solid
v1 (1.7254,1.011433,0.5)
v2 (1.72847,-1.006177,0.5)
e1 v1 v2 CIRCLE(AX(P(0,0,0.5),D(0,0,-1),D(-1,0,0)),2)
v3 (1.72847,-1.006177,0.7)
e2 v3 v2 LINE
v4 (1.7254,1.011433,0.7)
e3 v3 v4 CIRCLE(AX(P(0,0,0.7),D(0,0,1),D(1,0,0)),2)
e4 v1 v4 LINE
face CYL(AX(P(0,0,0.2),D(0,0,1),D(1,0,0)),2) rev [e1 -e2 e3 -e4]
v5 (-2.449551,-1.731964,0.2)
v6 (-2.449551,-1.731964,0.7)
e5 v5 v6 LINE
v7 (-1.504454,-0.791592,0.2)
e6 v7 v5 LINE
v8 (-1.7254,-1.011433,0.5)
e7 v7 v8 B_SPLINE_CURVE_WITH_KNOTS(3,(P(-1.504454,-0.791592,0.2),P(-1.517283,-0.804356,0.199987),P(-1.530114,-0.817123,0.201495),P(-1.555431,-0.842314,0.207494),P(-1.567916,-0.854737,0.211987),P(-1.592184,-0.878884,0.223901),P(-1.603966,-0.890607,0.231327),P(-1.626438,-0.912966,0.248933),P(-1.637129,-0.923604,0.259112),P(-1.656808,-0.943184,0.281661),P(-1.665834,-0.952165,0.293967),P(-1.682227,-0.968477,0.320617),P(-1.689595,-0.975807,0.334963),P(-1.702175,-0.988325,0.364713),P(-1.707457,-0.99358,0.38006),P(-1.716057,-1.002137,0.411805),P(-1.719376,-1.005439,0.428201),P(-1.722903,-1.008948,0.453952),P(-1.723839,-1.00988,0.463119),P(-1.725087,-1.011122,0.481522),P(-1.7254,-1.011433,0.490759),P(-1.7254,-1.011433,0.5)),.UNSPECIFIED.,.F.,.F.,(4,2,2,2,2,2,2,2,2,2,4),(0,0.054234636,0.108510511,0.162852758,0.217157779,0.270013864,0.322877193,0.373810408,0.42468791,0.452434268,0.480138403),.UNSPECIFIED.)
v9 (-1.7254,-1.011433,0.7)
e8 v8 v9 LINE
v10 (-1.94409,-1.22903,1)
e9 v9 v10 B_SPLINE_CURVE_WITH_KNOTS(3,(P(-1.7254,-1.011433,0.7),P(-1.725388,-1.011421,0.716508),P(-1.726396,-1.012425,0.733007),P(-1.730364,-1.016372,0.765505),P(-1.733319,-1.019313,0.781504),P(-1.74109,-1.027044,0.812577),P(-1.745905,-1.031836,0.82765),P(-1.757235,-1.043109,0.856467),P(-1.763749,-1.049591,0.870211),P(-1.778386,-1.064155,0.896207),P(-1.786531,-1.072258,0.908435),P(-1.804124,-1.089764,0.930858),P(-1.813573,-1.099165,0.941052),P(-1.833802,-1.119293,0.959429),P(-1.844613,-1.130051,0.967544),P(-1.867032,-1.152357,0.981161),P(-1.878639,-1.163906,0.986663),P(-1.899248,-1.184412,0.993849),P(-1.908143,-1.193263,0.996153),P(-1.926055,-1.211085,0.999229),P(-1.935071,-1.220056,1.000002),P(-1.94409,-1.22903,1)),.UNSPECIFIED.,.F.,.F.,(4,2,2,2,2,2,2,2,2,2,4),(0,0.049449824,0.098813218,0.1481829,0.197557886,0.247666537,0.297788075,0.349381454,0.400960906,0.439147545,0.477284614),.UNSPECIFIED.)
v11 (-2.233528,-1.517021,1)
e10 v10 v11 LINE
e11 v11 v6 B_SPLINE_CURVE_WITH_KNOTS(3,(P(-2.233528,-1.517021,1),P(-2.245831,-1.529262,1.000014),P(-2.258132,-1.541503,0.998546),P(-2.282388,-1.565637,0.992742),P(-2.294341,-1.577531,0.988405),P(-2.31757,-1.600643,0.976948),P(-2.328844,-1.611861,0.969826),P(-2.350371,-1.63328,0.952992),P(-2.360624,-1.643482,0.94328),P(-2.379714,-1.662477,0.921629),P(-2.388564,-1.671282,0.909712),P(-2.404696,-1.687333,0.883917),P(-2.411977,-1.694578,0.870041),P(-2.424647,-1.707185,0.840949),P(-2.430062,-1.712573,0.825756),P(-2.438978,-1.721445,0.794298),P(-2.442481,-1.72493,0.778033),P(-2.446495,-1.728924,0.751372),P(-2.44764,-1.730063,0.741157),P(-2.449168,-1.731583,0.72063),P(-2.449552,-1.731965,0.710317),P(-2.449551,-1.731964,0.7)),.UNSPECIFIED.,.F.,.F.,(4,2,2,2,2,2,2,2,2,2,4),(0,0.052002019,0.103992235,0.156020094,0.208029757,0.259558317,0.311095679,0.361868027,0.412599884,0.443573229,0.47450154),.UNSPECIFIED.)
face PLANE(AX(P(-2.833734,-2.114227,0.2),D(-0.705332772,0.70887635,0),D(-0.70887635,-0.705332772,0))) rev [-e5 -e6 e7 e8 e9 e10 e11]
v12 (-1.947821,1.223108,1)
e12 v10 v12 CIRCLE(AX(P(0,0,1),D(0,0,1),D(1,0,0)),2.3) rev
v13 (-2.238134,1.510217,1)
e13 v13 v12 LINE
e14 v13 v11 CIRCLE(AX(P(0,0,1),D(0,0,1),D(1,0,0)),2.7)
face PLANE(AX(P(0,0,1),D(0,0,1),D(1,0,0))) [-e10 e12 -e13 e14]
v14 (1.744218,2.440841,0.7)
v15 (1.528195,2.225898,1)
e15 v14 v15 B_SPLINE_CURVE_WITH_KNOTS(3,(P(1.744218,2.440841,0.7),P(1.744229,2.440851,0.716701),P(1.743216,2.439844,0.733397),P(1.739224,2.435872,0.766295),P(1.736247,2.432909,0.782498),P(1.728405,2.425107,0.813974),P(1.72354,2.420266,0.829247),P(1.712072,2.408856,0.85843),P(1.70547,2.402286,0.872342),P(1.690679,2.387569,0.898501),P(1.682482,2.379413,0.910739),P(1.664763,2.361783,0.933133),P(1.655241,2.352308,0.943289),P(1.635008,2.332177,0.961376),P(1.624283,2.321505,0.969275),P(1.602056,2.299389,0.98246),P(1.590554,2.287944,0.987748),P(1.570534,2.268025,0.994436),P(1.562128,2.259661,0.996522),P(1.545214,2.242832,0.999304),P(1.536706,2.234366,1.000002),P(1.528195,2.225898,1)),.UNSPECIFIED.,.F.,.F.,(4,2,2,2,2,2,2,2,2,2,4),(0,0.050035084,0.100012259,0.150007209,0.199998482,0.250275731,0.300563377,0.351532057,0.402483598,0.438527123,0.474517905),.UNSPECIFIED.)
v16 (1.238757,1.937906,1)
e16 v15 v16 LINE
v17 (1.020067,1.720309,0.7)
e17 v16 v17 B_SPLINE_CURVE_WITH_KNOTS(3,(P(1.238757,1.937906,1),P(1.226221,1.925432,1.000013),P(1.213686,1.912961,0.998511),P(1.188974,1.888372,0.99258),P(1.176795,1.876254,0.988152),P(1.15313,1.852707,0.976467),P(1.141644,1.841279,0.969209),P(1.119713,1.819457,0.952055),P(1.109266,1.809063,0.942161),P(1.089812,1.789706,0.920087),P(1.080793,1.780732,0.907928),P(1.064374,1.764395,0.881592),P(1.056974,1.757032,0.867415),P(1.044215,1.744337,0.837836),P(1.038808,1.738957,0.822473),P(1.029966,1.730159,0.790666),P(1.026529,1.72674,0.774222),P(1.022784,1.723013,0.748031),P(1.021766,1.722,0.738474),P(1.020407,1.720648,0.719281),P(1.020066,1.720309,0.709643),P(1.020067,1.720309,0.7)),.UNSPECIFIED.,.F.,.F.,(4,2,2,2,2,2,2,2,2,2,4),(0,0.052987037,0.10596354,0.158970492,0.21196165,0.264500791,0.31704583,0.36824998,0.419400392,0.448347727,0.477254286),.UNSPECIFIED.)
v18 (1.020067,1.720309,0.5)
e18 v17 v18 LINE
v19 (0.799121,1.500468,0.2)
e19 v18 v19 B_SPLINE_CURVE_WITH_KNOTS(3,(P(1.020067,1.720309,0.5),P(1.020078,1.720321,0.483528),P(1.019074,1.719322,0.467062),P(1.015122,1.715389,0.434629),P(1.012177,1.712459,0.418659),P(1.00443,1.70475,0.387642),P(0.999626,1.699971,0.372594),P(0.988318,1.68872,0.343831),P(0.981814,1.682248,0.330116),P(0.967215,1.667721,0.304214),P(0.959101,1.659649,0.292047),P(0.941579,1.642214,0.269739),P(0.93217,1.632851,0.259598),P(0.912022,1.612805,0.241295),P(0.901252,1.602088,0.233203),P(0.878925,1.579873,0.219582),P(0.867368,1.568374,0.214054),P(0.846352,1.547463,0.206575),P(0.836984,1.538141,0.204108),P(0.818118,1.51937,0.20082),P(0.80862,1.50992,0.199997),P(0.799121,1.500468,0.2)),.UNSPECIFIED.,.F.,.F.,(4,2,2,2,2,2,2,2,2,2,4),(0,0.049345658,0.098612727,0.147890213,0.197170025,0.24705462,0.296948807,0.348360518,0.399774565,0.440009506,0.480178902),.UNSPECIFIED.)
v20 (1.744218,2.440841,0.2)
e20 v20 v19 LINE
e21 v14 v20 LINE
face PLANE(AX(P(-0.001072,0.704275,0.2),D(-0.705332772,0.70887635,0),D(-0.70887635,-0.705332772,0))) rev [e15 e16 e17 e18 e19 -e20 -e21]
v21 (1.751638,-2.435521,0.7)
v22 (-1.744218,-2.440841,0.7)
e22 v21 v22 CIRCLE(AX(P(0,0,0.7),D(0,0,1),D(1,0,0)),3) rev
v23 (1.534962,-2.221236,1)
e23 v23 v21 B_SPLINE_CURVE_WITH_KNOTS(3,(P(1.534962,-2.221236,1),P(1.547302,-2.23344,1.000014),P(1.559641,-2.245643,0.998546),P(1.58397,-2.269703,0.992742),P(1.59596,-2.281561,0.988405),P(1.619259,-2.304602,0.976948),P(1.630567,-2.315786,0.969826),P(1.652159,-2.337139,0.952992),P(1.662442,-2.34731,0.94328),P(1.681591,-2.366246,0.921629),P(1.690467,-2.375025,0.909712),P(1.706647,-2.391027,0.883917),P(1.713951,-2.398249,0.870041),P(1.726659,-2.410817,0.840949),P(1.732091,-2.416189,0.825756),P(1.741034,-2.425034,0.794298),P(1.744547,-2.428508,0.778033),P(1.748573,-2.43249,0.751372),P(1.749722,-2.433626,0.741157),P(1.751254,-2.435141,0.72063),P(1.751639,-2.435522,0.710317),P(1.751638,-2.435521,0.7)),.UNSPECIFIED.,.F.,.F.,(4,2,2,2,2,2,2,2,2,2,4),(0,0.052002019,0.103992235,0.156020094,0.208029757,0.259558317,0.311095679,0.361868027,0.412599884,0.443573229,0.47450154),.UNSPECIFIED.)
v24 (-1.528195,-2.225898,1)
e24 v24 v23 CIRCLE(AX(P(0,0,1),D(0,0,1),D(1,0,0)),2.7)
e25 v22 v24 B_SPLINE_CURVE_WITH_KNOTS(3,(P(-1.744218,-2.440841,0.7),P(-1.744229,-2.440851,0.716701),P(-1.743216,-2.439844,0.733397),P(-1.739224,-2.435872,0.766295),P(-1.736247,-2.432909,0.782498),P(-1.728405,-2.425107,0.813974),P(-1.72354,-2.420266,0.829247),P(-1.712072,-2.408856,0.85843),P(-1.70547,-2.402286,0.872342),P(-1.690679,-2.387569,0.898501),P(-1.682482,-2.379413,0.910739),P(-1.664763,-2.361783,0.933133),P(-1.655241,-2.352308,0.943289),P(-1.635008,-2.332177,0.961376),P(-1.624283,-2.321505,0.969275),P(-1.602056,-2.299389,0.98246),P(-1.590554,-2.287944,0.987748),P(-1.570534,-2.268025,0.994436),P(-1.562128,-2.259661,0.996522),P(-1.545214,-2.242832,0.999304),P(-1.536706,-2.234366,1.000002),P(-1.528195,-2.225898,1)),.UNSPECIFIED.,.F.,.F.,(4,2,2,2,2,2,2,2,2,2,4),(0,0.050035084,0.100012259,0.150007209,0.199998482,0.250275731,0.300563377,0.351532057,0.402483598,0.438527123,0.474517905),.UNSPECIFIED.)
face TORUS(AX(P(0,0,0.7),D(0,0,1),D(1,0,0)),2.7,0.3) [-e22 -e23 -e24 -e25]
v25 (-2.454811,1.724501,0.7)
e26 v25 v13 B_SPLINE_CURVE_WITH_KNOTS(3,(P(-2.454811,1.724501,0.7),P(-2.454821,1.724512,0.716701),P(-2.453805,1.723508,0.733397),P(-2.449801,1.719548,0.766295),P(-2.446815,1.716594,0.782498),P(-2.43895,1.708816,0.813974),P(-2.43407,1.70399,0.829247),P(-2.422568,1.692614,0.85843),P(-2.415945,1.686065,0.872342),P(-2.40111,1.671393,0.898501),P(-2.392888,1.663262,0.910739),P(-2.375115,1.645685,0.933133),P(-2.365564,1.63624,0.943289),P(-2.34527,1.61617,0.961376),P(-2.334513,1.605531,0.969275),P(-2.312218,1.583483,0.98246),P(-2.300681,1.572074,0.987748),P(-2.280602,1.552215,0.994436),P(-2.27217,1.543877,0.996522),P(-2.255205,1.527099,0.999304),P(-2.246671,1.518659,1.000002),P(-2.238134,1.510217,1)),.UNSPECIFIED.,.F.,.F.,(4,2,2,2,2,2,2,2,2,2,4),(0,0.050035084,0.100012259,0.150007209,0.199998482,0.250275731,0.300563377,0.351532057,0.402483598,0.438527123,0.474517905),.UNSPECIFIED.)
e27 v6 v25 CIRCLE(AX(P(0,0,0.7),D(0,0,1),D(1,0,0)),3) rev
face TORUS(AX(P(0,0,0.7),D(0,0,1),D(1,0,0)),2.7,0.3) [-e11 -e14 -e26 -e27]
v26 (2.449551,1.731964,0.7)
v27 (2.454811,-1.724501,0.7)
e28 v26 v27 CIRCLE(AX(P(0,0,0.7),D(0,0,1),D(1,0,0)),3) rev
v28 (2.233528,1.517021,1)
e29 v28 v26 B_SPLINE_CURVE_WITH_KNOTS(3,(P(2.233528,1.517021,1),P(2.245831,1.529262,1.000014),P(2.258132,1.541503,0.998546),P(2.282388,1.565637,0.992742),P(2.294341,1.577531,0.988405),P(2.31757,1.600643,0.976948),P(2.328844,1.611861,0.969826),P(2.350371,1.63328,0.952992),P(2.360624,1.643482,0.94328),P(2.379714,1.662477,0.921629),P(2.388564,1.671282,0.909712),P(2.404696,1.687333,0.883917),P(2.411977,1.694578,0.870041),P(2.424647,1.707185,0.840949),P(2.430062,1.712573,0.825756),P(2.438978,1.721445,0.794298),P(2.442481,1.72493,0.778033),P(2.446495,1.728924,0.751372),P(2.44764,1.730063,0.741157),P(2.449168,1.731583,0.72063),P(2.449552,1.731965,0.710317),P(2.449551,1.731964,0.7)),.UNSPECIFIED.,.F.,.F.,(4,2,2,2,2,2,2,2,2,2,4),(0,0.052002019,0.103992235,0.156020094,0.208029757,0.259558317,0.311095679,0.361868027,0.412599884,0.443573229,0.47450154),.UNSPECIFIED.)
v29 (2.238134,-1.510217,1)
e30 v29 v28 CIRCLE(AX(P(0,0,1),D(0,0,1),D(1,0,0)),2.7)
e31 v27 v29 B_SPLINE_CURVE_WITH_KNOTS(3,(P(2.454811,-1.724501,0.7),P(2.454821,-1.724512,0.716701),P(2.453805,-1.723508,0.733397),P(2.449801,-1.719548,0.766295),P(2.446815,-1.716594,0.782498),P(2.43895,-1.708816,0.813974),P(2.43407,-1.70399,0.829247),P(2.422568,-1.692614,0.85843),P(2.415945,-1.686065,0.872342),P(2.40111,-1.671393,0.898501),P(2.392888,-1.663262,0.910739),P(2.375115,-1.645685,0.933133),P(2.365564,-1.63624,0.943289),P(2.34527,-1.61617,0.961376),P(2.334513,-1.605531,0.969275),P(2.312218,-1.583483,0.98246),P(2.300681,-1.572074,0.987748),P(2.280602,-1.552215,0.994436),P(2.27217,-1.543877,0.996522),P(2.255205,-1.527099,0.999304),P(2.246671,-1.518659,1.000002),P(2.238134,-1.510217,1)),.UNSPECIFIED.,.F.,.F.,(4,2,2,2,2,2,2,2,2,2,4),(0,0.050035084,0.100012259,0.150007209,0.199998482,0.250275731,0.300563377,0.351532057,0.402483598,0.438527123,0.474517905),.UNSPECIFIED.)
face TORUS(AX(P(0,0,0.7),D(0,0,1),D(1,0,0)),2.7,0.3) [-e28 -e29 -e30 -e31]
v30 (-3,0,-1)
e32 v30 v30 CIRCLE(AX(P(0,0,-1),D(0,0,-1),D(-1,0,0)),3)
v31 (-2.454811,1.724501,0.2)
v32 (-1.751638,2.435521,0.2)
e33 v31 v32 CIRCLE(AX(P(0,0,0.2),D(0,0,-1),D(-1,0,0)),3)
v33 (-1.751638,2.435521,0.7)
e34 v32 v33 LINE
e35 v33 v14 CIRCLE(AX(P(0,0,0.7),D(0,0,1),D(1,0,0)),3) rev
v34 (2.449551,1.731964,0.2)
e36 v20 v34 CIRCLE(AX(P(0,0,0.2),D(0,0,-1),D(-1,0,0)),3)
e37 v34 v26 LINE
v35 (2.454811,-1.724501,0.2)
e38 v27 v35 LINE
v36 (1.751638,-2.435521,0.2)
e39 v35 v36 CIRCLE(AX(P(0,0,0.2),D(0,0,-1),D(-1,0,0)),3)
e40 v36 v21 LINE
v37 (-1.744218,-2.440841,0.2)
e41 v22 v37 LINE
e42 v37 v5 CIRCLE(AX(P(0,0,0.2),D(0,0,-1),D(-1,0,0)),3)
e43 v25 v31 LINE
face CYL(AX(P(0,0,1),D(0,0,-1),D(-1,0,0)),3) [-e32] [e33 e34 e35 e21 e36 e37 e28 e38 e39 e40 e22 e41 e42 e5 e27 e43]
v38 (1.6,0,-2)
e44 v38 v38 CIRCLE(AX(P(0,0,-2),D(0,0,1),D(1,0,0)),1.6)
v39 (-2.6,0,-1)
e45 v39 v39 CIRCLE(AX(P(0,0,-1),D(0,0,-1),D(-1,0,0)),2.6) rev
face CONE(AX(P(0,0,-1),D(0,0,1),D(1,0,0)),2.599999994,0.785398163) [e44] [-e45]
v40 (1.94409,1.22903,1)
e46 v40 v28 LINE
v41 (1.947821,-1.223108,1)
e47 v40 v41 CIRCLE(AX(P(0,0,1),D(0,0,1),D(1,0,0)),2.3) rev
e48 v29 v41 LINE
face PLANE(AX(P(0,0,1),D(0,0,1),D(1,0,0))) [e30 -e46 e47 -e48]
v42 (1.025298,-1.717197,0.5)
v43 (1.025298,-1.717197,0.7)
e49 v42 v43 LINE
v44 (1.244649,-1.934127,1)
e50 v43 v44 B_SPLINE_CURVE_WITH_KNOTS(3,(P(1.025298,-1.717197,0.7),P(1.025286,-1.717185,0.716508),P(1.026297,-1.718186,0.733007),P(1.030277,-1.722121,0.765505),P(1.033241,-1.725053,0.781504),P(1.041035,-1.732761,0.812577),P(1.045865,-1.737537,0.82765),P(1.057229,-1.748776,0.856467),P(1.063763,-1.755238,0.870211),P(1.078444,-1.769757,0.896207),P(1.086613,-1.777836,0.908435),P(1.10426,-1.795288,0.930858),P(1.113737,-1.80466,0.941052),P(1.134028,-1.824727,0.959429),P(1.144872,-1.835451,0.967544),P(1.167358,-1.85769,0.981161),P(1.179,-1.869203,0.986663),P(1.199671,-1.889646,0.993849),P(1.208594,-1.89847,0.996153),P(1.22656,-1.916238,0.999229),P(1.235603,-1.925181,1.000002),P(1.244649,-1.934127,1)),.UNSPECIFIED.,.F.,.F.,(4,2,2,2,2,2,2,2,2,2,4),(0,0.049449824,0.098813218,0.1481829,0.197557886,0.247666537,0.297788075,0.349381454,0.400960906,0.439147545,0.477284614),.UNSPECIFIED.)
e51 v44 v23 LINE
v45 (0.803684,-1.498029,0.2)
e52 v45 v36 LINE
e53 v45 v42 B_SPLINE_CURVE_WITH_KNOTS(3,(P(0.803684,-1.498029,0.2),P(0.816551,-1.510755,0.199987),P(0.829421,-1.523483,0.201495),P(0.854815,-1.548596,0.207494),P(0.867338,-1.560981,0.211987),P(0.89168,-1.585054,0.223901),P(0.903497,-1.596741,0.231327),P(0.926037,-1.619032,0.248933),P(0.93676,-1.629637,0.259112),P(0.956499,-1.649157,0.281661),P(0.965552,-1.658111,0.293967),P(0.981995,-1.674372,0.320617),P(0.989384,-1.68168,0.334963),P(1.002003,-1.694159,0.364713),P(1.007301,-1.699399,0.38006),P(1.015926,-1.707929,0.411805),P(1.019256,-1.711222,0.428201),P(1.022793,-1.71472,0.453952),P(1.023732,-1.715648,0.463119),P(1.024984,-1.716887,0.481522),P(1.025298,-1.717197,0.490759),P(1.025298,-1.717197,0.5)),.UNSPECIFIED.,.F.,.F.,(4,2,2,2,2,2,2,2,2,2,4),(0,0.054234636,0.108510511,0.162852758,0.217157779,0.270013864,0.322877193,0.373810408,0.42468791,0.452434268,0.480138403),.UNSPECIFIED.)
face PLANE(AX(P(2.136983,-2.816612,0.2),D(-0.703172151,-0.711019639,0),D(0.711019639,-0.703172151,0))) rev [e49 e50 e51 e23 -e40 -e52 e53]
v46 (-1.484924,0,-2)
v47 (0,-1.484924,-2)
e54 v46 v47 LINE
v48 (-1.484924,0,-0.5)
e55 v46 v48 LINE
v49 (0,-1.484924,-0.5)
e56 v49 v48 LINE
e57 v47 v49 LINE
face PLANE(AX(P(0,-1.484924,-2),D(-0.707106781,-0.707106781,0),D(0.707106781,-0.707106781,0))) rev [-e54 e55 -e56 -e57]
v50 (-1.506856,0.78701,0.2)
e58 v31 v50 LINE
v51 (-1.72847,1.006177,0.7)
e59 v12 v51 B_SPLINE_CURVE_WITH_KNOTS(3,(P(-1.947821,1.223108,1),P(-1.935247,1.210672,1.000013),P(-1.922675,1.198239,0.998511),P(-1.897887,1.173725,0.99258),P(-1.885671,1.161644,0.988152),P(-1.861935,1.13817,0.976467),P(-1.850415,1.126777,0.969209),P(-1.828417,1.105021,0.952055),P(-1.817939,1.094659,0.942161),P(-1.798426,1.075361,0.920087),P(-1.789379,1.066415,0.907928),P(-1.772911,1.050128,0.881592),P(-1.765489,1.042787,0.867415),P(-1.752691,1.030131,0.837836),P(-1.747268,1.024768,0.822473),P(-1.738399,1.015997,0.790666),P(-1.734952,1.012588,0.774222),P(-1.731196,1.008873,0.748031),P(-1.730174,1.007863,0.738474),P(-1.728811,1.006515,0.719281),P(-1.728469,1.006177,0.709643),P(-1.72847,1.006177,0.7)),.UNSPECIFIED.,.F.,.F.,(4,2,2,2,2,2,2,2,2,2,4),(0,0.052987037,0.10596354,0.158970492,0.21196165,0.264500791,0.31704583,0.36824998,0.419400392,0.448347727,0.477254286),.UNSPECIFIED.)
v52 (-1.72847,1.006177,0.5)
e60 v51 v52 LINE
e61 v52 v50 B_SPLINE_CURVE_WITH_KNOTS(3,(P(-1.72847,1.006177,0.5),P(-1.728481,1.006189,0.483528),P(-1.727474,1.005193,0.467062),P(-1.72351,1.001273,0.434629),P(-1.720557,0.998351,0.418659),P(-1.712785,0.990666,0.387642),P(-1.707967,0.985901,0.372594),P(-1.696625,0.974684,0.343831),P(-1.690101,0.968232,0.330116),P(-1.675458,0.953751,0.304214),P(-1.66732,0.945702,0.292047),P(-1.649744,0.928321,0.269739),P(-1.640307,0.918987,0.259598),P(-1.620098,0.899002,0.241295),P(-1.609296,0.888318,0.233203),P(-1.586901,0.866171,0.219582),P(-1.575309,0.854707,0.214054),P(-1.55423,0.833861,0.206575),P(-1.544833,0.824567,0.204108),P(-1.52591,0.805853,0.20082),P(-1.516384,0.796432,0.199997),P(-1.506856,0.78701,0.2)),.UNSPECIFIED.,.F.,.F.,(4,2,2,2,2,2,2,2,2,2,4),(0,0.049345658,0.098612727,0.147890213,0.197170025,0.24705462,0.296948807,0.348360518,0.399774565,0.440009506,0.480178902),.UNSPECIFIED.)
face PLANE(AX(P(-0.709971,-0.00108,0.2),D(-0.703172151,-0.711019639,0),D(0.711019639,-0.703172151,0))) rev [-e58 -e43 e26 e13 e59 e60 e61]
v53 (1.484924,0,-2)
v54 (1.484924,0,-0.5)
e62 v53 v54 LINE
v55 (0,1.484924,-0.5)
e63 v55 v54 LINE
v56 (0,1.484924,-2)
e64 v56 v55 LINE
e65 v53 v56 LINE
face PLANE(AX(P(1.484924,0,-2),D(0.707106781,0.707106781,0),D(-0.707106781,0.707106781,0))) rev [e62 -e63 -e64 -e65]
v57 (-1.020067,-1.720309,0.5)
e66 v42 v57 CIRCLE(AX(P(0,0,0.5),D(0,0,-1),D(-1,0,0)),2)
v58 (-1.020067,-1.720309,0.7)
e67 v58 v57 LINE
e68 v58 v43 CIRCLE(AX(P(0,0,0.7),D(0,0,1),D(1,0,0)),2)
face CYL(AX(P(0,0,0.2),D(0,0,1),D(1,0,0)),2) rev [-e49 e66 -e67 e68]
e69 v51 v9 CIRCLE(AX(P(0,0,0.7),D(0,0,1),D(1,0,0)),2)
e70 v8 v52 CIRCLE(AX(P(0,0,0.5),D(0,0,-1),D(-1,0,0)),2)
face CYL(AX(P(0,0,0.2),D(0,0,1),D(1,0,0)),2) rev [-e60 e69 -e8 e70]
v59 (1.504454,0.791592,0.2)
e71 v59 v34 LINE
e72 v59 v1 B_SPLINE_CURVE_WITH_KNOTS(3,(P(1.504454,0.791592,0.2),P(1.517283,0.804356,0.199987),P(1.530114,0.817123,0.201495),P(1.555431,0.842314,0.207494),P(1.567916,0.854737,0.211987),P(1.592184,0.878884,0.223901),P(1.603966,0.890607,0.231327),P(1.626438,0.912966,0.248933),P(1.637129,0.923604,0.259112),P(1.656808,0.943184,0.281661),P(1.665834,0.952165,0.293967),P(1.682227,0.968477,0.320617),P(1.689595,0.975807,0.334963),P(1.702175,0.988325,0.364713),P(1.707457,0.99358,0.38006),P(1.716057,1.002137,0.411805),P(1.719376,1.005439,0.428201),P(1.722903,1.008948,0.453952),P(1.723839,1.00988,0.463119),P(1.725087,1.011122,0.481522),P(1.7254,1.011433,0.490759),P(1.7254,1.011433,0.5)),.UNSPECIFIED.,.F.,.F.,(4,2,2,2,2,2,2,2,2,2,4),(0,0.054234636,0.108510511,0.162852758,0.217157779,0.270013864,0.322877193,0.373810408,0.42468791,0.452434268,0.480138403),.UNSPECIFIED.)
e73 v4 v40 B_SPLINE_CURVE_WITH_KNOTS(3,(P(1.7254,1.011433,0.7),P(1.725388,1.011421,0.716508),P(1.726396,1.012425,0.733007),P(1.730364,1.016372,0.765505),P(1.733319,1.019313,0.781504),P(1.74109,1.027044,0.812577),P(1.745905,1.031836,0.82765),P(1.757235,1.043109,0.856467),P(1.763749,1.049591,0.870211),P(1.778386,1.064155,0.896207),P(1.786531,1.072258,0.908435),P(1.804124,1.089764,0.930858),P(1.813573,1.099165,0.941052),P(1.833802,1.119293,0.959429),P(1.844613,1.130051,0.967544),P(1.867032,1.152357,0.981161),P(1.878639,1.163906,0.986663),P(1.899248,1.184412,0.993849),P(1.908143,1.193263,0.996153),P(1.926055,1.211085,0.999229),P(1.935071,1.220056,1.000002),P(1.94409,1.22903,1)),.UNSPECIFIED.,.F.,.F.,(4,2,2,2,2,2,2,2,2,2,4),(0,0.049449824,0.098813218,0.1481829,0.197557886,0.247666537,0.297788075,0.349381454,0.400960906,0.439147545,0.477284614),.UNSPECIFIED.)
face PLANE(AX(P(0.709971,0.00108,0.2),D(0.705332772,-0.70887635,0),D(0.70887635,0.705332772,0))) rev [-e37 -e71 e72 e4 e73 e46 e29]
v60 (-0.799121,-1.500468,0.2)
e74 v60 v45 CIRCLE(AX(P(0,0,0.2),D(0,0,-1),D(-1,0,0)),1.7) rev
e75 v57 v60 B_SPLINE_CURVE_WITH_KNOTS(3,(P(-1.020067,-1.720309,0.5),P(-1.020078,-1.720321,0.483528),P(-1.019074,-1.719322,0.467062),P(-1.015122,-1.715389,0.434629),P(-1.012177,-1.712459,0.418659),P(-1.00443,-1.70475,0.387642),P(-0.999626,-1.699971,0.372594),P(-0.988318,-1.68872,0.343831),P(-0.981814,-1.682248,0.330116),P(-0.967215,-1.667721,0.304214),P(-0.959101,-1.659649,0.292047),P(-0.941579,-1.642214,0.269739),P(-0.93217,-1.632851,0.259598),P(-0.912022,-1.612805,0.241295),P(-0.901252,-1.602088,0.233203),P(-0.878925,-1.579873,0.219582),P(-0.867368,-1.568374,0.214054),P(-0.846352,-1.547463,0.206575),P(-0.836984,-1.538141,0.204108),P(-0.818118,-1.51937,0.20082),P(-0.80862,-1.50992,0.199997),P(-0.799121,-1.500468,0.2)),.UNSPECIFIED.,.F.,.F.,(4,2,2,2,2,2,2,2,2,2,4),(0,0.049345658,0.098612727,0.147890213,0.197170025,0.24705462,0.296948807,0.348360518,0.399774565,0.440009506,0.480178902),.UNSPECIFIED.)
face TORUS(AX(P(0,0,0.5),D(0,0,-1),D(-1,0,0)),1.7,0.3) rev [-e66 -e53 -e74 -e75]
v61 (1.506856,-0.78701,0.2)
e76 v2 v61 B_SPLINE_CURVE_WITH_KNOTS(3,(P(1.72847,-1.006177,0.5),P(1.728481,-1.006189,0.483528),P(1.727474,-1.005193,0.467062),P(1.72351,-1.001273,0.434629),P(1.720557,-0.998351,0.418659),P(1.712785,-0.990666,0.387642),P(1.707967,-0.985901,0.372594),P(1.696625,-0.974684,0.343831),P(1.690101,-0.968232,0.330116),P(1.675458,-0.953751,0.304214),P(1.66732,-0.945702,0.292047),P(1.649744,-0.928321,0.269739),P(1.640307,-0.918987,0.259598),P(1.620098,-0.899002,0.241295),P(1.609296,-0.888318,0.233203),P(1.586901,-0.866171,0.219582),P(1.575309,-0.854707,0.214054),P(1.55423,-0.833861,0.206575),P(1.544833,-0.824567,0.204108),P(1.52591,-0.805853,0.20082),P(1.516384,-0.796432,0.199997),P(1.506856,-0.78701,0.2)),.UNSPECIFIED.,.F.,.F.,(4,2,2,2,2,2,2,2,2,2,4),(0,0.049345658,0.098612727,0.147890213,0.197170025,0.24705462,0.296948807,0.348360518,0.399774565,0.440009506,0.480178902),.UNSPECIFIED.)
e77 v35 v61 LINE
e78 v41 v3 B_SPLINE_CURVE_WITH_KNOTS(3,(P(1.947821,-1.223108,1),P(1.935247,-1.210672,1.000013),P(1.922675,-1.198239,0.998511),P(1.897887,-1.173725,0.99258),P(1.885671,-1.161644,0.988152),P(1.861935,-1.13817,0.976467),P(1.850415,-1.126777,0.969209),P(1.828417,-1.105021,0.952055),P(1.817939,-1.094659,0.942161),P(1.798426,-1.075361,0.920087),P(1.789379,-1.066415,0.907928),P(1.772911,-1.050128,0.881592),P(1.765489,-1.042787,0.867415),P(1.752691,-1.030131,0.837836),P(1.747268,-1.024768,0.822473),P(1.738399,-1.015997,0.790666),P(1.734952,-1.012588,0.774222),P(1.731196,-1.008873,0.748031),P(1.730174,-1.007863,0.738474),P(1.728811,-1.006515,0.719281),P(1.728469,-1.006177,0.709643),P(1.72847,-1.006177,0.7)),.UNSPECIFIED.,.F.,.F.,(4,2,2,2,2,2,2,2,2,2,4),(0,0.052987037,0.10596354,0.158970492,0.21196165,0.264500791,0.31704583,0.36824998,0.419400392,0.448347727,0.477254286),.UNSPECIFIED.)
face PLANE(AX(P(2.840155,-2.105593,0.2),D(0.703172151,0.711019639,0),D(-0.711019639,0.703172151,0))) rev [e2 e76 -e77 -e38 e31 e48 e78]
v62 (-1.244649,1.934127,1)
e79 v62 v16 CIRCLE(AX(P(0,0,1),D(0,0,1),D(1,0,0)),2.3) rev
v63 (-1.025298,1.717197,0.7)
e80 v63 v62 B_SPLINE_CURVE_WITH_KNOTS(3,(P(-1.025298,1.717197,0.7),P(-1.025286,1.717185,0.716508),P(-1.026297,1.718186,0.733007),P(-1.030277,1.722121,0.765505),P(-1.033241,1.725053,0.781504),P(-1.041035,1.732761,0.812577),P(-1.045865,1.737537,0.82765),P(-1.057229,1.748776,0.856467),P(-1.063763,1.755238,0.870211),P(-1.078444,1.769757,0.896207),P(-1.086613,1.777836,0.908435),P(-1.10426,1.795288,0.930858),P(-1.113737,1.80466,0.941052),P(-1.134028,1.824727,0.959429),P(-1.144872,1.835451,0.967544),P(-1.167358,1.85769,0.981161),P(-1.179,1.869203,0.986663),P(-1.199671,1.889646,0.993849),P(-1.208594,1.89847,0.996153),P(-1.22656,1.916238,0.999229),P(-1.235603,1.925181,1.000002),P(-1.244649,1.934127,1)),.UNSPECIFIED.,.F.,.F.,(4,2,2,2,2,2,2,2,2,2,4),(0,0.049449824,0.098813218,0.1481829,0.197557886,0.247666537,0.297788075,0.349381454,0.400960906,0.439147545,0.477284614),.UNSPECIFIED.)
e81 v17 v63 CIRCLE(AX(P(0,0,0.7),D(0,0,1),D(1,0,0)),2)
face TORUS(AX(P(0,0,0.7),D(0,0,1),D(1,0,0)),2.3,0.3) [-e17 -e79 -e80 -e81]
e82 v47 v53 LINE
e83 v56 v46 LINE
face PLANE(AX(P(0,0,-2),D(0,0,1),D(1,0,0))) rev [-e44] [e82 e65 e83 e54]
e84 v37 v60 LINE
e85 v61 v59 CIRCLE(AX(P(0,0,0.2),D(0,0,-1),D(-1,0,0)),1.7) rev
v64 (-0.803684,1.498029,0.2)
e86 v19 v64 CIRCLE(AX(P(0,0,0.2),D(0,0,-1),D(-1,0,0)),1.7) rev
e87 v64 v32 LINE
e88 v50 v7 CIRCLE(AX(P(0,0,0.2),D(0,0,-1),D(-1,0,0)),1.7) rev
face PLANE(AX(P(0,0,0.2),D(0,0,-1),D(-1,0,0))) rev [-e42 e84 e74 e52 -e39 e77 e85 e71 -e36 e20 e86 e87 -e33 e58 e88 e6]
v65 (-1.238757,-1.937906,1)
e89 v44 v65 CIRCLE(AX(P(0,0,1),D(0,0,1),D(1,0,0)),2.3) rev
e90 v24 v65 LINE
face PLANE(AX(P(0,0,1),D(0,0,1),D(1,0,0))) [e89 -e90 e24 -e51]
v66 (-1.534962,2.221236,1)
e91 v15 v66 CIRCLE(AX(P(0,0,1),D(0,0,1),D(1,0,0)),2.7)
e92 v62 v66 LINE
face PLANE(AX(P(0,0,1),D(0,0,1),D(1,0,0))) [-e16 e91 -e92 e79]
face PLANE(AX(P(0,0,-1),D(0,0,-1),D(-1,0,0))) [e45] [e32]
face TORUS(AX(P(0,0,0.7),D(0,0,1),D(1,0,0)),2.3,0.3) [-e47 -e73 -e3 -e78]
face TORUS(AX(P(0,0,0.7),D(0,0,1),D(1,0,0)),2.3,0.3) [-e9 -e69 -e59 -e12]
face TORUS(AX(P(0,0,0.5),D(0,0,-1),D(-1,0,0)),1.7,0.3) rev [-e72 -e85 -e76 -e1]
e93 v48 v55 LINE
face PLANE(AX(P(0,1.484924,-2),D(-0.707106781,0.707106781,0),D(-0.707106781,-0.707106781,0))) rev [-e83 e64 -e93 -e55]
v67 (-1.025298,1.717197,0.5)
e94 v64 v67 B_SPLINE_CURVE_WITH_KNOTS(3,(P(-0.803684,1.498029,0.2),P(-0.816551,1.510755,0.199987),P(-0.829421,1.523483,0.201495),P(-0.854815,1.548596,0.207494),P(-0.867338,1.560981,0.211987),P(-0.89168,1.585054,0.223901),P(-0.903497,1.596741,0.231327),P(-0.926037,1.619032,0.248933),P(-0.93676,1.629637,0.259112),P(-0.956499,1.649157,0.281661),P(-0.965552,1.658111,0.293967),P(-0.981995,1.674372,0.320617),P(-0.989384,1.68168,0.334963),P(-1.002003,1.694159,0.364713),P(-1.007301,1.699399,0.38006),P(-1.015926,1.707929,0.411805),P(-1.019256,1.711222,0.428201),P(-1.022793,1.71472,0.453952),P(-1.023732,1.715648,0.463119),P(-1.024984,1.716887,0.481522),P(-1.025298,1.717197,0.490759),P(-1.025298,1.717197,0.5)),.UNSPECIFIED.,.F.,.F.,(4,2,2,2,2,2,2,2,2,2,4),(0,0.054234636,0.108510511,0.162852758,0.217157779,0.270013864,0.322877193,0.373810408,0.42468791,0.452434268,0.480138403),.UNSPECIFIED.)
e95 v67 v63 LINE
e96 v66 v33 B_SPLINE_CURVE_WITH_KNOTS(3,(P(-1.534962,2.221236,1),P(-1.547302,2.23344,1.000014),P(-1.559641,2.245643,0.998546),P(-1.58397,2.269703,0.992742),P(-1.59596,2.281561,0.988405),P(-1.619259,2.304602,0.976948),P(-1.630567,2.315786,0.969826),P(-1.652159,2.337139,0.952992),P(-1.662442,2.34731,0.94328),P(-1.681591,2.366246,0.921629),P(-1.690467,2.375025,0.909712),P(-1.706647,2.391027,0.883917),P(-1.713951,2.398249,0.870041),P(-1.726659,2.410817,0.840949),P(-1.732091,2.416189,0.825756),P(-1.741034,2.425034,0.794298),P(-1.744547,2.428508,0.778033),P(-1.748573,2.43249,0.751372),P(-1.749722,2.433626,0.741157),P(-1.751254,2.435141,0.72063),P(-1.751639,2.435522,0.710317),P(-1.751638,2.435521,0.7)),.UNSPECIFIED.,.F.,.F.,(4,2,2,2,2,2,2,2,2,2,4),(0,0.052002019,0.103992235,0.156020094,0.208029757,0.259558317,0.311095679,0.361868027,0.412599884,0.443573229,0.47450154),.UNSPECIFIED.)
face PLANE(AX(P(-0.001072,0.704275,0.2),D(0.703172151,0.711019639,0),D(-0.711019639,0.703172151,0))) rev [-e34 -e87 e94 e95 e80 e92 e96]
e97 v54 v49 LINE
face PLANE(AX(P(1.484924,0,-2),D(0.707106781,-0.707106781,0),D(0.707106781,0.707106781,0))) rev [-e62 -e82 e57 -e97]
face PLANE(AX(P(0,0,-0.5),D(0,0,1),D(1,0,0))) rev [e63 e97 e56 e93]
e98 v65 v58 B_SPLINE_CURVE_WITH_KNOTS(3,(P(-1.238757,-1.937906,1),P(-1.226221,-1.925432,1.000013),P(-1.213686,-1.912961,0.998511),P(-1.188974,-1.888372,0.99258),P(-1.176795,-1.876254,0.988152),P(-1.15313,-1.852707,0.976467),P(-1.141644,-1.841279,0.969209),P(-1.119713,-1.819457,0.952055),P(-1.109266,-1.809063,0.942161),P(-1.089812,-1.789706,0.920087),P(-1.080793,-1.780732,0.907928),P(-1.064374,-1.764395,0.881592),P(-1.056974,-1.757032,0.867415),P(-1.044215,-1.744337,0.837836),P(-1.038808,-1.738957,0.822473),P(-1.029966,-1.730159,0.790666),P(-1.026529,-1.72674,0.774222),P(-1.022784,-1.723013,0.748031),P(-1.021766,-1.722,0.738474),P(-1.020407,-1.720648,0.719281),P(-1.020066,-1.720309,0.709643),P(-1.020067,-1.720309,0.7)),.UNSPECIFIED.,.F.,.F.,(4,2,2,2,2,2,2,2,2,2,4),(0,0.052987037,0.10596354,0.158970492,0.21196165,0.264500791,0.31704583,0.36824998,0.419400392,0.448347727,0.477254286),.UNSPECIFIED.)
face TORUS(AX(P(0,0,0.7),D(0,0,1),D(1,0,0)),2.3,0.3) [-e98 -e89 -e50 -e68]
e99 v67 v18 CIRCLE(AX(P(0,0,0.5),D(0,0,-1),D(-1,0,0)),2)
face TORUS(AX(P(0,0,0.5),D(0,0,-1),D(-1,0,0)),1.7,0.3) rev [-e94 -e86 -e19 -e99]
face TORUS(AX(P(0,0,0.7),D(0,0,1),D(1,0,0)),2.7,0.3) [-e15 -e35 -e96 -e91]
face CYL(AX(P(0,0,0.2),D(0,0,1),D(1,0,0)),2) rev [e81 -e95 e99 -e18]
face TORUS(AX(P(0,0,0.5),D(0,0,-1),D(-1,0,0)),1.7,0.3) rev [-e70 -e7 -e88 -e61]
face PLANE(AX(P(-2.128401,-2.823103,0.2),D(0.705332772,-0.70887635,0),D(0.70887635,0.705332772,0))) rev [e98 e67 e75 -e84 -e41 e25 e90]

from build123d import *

# Parameters (mm, degrees)
SKETCH_1_R          = 1.599999994
EXTRUDE_1_DEPTH     = 2
SKETCH_2_R          = 3
EXTRUDE_2_DEPTH     = 1
SKETCH_3_R          = 3
SKETCH_3_R_2        = 1.599999994
EXTRUDE_3_DEPTH     = 1
CUT_EXTRUDE_1_DEPTH = 0.8
SKETCH_5_R          = 2
CUT_EXTRUDE_2_DEPTH = 0.8
FILLET_1_R          = 0.3
FILLET_2_R          = 0.3
CHAMFER_2_SIZE      = 1
EXTRUDE_4_DEPTH     = 0.5


# Some blends are built 0.0001 mm under size
with BuildPart() as part:
    # 草图1 → 凸台-拉伸1 (new body)
    with BuildSketch(Plane.XY):
        Circle(SKETCH_1_R)
        Polygon((1.484924235, 0), (0, 1.484924235), (-1.484924235, 0), (0, -1.484924235), align=None, mode=Mode.SUBTRACT)
    extrude(amount=-EXTRUDE_1_DEPTH)

    # 草图2 → 凸台-拉伸2 (add)
    with BuildSketch(Plane.XY):
        Circle(SKETCH_2_R)
    extrude(amount=EXTRUDE_2_DEPTH)

    # 草图3 → 凸台-拉伸3 (add)
    with BuildSketch(Plane(origin=(0, 0, 0), x_dir=(-1, 0, 0), z_dir=(0, 0, -1))):
        Circle(SKETCH_3_R)
        with Locations(Location((0, 0, 0), (0, 0, 180))):
            Circle(SKETCH_3_R_2, mode=Mode.SUBTRACT)
    extrude(amount=EXTRUDE_3_DEPTH)

    # 草图4 → 切除-拉伸1 (cut)
    with BuildSketch(Plane.XY.offset(1)):
        Polygon((2.840154811, -2.105592708), (2.13698266, -2.816612347), (0.001071679, -0.704275308), (-2.12840084, -2.823102879), (-2.833733613, -2.114226528), (-0.709971025, -0.001080346), (-2.840154811, 2.105592708), (-2.13698266, 2.816612347), (-0.001071679, 0.704275308), (2.12840084, 2.823102879), (2.833733613, 2.114226528), (0.709971025, 0.001080346), align=None)
    extrude(amount=-CUT_EXTRUDE_1_DEPTH, mode=Mode.SUBTRACT)

    # 草图5 → 切除-拉伸2 (cut)
    with BuildSketch(Plane.XY.offset(1)):
        Circle(SKETCH_5_R)
    extrude(amount=-CUT_EXTRUDE_2_DEPTH, mode=Mode.SUBTRACT)

    # 圆角1
    fillet_1_edges = [part.edges().sort_by_distance(p)[0] for p in [
        (1.930129409, 0.524023343, 1),
        (0.003043349, -1.999997685, 1),
        (-1.999997685, -0.003043349, 1),
        (-0.003043349, 1.999997685, 1),
        (-0.004565023, 2.999996527, 1),
        (-2.999996527, -0.004565023, 1),
        (0.004565023, -2.999996527, 1),
        (2.859077887, 0.908665855, 1),
    ]]
    fillet(fillet_1_edges, radius=FILLET_1_R)

    # 圆角2
    # the kernel refuses this fillet: 0.3 mm, written as the material it adds along each edge
    with BuildSketch(Plane(origin=(0, 0, 0.2), x_dir=(0.7896841124236736, 0.613513653137104, 0), z_dir=(0.613513653137104, -0.7896841124236736, 0))) as fillet_2_piece_1_section:
        with BuildLine():
            CenterArc((2 - FILLET_2_R, FILLET_2_R), FILLET_2_R, 270, 90)
            Line((2 - FILLET_2_R, 0), (2, 0))
            Line((2, 0), (2, FILLET_2_R))
        make_face()
    fillet_2_piece_1 = revolve(axis=Axis((0, 0, 0.2), (0, 0, 1)), revolution_arc=104.486373309, mode=Mode.PRIVATE)
    fillet_2_piece_1 = split(fillet_2_piece_1, bisect_by=Plane(origin=(0.603196481, 1.305522812, 0.285319886), z_dir=(-0.7053327724211024, 0.7088763503945956, 0)), keep=Keep.TOP, mode=Mode.PRIVATE)
    fillet_2_piece_1 = split(fillet_2_piece_1, bisect_by=Plane(origin=(-0.607166844, 1.303681031, 0.285319886), z_dir=(0.7031721506430704, 0.711019638659861, 0)), keep=Keep.TOP, mode=Mode.PRIVATE)
    add(fillet_2_piece_1)
    with BuildSketch(Plane(origin=(0, 0, 0.2), x_dir=(1, 0, 0), z_dir=(0, -1, 0))) as fillet_2_piece_2_section:
        with BuildLine():
            CenterArc((2 - FILLET_2_R, FILLET_2_R), FILLET_2_R, 270, 90)
            Line((2 - FILLET_2_R, 0), (2, 0))
            Line((2, 0), (2, FILLET_2_R))
        make_face()
    fillet_2_piece_2 = revolve(axis=Axis((0, 0, 0.2), (0, 0, 1)), revolution_arc=51.865822775, mode=Mode.PRIVATE)
    fillet_2_piece_2 = split(fillet_2_piece_2, bisect_by=Plane(origin=(1.528365858, 0.815384132, 0.269855635), z_dir=(0.7053327724211024, -0.7088763503945955, 0)), keep=Keep.TOP, mode=Mode.PRIVATE)
    add(fillet_2_piece_2)
    with BuildSketch(Plane(origin=(0, 0, 0.2), x_dir=(-0.7896841124236732, -0.6135136531371046, 0), z_dir=(-0.6135136531371046, 0.7896841124236732, 0))) as fillet_2_piece_3_section:
        with BuildLine():
            CenterArc((2 - FILLET_2_R, FILLET_2_R), FILLET_2_R, 270, 90)
            Line((2 - FILLET_2_R, 0), (2, 0))
            Line((2, 0), (2, FILLET_2_R))
        make_face()
    fillet_2_piece_3 = revolve(axis=Axis((0, 0, 0.2), (0, 0, 1)), revolution_arc=104.486373309, mode=Mode.PRIVATE)
    fillet_2_piece_3 = split(fillet_2_piece_3, bisect_by=Plane(origin=(0.607166844, -1.303681031, 0.285319886), z_dir=(-0.7031721506430706, -0.7110196386598608, 0)), keep=Keep.TOP, mode=Mode.PRIVATE)
    fillet_2_piece_3 = split(fillet_2_piece_3, bisect_by=Plane(origin=(-0.603196481, -1.305522812, 0.285319886), z_dir=(0.7053327724211026, -0.7088763503945954, 0)), keep=Keep.TOP, mode=Mode.PRIVATE)
    add(fillet_2_piece_3)
    with BuildSketch(Plane(origin=(0, 0, 0.2), x_dir=(-0.6198560202042671, 0.784715562619047, 0), z_dir=(0.784715562619047, 0.6198560202042671, 0))) as fillet_2_piece_4_section:
        with BuildLine():
            CenterArc((2 - FILLET_2_R, FILLET_2_R), FILLET_2_R, 270, 90)
            Line((2 - FILLET_2_R, 0), (2, 0))
            Line((2, 0), (2, FILLET_2_R))
        make_face()
    fillet_2_piece_4 = revolve(axis=Axis((0, 0, 0.2), (0, 0, 1)), revolution_arc=103.563128964, mode=Mode.PRIVATE)
    fillet_2_piece_4 = split(fillet_2_piece_4, bisect_by=Plane(origin=(-1.316253088, -0.604331686, 0.285332918), z_dir=(-0.7053327724211024, 0.7088763503945957, 0)), keep=Keep.TOP, mode=Mode.PRIVATE)
    fillet_2_piece_4 = split(fillet_2_piece_4, bisect_by=Plane(origin=(-1.318086183, 0.600323075, 0.285332918), z_dir=(-0.7031721506430707, -0.7110196386598606, 0)), keep=Keep.TOP, mode=Mode.PRIVATE)
    add(fillet_2_piece_4)
    with BuildSketch(Plane(origin=(0, 0, 0.2), x_dir=(0.6198962648649622, -0.7846837712139004, 0), z_dir=(-0.7846837712139004, -0.6198962648649622, 0))) as fillet_2_piece_5_section:
        with BuildLine():
            CenterArc((2 - FILLET_2_R, FILLET_2_R), FILLET_2_R, 270, 90)
            Line((2 - FILLET_2_R, 0), (2, 0))
            Line((2, 0), (2, FILLET_2_R))
        make_face()
    fillet_2_piece_5 = revolve(axis=Axis((0, 0, 0.2), (0, 0, 1)), revolution_arc=51.69144042, mode=Mode.PRIVATE)
    fillet_2_piece_5 = split(fillet_2_piece_5, bisect_by=Plane(origin=(1.532032043, -0.811907626, 0.269859578), z_dir=(0.7031721506430706, 0.7110196386598608, 0)), keep=Keep.TOP, mode=Mode.PRIVATE)
    add(fillet_2_piece_5)

    # 倒角2
    chamfer_2_edges = [part.edges().sort_by_distance(p)[0] for p in [
        (-1.599999994, 0, -1),
    ]]
    chamfer(chamfer_2_edges, length=CHAMFER_2_SIZE - 0.0001)  # a hair under: the kernel refuses the full size

    # 草图6 → 凸台-拉伸4 (add)
    with BuildSketch(Plane(origin=(0, 0, 0), x_dir=(-1, 0, 0), z_dir=(0, 0, -1))):
        Polygon((0, 1.484924235), (1.484924235, 0), (0, -1.484924235), (-1.484924235, 0), align=None)
    extrude(amount=EXTRUDE_4_DEPTH)


solid = part.part
